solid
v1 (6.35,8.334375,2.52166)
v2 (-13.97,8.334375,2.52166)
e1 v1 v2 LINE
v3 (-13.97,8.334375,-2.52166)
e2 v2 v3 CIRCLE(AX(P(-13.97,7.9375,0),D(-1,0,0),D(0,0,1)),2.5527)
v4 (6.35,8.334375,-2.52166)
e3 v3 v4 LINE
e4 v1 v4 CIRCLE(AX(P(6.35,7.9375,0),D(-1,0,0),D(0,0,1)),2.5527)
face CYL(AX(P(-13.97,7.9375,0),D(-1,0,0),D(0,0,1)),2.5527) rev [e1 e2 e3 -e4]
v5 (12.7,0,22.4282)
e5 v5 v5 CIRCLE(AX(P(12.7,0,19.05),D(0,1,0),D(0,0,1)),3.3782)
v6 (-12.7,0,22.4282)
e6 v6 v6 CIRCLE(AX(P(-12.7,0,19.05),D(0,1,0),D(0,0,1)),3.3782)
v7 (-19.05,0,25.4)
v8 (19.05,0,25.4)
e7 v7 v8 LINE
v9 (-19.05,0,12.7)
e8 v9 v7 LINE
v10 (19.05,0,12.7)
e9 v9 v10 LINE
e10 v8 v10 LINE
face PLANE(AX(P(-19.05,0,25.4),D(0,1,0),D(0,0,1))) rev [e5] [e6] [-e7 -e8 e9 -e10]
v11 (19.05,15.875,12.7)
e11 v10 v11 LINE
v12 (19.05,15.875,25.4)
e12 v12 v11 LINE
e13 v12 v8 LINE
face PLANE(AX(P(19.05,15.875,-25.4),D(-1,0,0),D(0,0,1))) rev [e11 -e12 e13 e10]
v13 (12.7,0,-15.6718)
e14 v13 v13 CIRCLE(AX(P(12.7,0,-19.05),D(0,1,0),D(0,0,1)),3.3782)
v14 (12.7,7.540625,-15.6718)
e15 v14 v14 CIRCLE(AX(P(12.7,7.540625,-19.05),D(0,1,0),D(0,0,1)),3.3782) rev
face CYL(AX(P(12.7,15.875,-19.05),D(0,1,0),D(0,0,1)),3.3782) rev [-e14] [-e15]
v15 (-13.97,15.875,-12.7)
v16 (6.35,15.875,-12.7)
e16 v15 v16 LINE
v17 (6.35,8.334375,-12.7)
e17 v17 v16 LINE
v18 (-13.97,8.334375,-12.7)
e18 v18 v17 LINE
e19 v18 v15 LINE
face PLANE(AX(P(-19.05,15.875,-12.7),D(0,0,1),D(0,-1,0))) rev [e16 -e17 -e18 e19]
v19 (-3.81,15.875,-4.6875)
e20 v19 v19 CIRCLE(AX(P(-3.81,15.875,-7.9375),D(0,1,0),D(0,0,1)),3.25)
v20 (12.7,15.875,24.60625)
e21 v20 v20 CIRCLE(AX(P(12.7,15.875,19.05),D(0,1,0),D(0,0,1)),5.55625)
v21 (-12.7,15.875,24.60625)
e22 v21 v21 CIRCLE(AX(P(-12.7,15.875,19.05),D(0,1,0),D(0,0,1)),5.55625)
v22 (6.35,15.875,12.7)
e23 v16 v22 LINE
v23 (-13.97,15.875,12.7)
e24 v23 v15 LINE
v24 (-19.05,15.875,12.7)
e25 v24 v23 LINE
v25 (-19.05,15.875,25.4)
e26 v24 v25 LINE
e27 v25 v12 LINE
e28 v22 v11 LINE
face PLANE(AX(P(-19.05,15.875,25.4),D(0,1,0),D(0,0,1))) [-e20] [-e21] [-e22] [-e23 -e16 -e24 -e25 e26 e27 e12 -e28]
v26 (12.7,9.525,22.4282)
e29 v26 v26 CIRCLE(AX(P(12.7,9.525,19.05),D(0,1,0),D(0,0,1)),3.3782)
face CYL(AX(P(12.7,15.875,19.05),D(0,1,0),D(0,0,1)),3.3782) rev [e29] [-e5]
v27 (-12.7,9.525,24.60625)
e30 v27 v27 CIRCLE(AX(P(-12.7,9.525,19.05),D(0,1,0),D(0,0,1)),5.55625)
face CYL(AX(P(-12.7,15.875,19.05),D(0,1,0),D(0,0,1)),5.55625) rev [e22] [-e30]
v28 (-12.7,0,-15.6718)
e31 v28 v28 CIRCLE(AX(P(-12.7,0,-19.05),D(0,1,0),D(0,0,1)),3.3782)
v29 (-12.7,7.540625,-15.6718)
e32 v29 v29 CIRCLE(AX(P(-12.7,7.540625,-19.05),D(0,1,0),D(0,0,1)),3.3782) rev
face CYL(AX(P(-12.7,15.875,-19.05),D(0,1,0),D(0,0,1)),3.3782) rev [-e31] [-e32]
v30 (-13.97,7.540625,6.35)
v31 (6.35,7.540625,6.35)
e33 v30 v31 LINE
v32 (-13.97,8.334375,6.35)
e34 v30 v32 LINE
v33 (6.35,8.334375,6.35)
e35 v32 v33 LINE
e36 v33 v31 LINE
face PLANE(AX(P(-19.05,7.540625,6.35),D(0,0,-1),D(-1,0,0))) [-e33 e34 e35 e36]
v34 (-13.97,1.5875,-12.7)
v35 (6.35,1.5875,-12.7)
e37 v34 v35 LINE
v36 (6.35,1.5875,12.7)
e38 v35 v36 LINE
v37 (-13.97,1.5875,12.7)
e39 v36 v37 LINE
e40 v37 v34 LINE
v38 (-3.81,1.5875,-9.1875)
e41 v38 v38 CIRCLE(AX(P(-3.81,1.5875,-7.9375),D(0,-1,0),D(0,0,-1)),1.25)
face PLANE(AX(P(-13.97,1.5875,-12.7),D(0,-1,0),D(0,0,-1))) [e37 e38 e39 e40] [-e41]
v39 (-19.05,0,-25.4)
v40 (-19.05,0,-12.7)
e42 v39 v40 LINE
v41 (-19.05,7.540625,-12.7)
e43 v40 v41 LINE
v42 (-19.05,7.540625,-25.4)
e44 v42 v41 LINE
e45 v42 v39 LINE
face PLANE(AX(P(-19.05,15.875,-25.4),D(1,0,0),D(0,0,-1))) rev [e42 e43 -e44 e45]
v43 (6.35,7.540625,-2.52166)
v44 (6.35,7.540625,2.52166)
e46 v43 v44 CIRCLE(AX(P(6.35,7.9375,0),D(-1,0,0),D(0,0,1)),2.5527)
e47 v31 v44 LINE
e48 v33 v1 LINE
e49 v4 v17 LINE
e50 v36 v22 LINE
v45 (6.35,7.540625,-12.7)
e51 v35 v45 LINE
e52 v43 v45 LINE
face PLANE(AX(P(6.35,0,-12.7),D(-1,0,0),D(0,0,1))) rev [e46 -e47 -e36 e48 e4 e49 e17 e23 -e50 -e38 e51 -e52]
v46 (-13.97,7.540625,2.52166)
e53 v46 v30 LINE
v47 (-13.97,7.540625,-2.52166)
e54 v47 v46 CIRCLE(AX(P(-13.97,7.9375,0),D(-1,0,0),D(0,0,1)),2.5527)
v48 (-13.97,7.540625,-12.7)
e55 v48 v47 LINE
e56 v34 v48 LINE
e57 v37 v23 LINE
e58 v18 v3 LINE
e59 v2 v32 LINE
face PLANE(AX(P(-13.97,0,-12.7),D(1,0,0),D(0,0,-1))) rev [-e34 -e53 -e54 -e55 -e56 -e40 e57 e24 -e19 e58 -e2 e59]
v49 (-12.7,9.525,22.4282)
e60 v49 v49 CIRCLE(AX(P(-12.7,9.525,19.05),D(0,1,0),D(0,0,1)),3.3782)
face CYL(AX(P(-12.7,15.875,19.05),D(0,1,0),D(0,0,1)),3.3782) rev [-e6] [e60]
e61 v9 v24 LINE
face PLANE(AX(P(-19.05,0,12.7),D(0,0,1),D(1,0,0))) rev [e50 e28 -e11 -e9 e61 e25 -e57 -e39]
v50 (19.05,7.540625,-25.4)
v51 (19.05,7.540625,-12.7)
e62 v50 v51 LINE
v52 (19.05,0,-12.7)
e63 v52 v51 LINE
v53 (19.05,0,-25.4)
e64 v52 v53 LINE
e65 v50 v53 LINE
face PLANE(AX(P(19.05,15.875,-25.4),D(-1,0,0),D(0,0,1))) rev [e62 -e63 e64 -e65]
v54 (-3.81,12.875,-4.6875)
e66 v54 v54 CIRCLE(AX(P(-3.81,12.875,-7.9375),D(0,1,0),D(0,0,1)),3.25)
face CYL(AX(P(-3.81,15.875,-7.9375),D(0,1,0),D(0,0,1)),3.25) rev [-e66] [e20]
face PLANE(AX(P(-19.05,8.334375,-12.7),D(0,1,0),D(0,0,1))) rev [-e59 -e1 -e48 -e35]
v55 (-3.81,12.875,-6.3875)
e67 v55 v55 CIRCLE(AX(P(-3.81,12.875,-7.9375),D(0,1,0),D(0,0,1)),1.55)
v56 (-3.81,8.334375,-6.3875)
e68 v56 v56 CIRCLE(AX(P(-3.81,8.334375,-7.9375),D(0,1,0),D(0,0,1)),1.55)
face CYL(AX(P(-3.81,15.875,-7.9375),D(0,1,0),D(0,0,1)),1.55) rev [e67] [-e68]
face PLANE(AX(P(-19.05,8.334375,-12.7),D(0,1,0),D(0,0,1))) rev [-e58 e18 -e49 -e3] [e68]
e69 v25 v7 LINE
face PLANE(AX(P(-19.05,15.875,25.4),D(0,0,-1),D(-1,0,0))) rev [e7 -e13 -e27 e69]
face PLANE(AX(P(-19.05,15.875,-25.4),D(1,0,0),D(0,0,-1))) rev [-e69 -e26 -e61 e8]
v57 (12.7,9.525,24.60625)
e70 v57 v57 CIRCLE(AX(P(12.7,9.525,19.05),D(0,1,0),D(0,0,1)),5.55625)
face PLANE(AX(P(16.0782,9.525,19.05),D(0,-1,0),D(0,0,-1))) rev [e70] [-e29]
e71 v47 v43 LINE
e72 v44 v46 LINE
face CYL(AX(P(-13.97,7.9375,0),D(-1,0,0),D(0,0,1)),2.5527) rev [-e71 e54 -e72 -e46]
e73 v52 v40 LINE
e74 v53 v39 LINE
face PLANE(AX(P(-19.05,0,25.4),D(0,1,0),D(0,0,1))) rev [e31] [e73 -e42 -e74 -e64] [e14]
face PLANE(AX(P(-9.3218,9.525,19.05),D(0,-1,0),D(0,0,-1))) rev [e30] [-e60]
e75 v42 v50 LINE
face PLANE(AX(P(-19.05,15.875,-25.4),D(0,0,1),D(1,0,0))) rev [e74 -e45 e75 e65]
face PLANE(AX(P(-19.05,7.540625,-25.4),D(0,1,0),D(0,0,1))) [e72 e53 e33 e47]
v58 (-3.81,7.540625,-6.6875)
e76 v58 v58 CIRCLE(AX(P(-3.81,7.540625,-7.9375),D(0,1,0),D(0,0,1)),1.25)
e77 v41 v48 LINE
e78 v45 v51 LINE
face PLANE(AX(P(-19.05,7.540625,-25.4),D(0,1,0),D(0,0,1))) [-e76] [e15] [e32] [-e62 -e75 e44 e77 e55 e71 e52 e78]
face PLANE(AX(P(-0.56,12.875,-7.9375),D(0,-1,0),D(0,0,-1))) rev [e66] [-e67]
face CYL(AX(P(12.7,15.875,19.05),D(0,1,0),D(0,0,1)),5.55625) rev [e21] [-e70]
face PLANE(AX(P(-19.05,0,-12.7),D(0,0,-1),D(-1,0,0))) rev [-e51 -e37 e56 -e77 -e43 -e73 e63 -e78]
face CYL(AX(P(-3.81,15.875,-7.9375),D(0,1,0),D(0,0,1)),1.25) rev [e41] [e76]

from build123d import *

# Parameters (mm, degrees)
SKETCH1_W                                        = 38.1
SKETCH1_H                                        = 50.8
EXTRUDE1_DEPTH                                   = 15.875
CBORE_FOR_1_4_SOCKET_HEAD_CAP_SCREW1_D           = 6.7564
CBORE_FOR_1_4_SOCKET_HEAD_CAP_SCREW1_CBORE_D     = 11.1125
CBORE_FOR_1_4_SOCKET_HEAD_CAP_SCREW1_CBORE_DEPTH = 6.35
SKETCH3_W                                        = 5.08
SKETCH3_H                                        = 25.4
SKETCH3_W_2                                      = 12.7
CUT_EXTRUDE2_DEPTH                               = 36.497579143
SKETCH5_W                                        = 20.32
SKETCH5_H                                        = 25.4
CUT_EXTRUDE4_DEPTH                               = 1.5875
F_1_4_20_TAPPED_HOLE1_D                          = 5.1054
SKETCH11_W                                       = 19.05
SKETCH11_H                                       = 0.79375
CUT_EXTRUDE5_DEPTH                               = 49.464271634
ADVANCEDHOLE1_START                              = 12.875
ADVANCEDHOLE1_OUTLINE_R                          = 3.25
ADVANCEDHOLE1_DEPTH                              = 3
ADVANCEDHOLE1_START_2                            = 1.5875
ADVANCEDHOLE1_2_OUTLINE_R                        = 1.25
ADVANCEDHOLE1_2_DEPTH                            = 11.2875
ADVANCEDHOLE1_START_3                            = 8.334375
ADVANCEDHOLE1_3_OUTLINE_R                        = 1.55
ADVANCEDHOLE1_3_OUTLINE_R_2                      = 1.25
ADVANCEDHOLE1_3_DEPTH                            = 4.540625


# Read off the part's stored shape, not the designer's step: AdvancedHole1
with BuildPart() as part:
    # Sketch1 → Extrude1 (new body)
    with BuildSketch(Plane(origin=(0, 0, 0), x_dir=(1, 0, 0), z_dir=(0, 1, 0))):
        Rectangle(SKETCH1_W, SKETCH1_H)
    extrude(amount=EXTRUDE1_DEPTH)

    # CBORE for 1/4 Socket Head Cap Screw1 (through all)
    with Locations(Plane(origin=(0, 15.875, 0), x_dir=(-1, 0, 0), z_dir=(0, 1, 0))):
        with Locations((12.7, -19.05), (-12.7, -19.05), (-12.7, 19.05), (12.7, 19.05)):
            CounterBoreHole(CBORE_FOR_1_4_SOCKET_HEAD_CAP_SCREW1_D / 2, CBORE_FOR_1_4_SOCKET_HEAD_CAP_SCREW1_CBORE_D / 2, CBORE_FOR_1_4_SOCKET_HEAD_CAP_SCREW1_CBORE_DEPTH)

    # Sketch3 → Cut-Extrude2 (cut, through all)
    with BuildSketch(Plane(origin=(0, 15.875, 0), x_dir=(-1, 0, 0), z_dir=(0, 1, 0))):
        with Locations((16.51, 0)):
            Rectangle(SKETCH3_W, SKETCH3_H)
        with Locations((-12.7, 0)):
            Rectangle(SKETCH3_W_2, SKETCH3_H)
    extrude(amount=-CUT_EXTRUDE2_DEPTH, mode=Mode.SUBTRACT)

    # Sketch5 → Cut-Extrude4 (cut)
    with BuildSketch(Plane.XZ):
        with Locations((-3.81, 0)):
            Rectangle(SKETCH5_W, SKETCH5_H)
    extrude(amount=-CUT_EXTRUDE4_DEPTH, mode=Mode.SUBTRACT)

    # 1/4-20 Tapped Hole1 (through all)
    with Locations(Plane.ZY.offset(13.97)):
        with Locations((0, 7.9375)):
            Hole(F_1_4_20_TAPPED_HOLE1_D / 2)

    # Sketch11 → Cut-Extrude5 (cut, through all)
    with BuildSketch(Plane(origin=(19.05, 0, 0), x_dir=(0, 0, -1), z_dir=(1, 0, 0))):
        Polygon((25.4, 7.540625), (25.4, 15.875), (12.7, 15.875), (12.7, 8.334375), (12.7, 7.540625), align=None)
        with Locations((3.175, 7.9375)):
            Rectangle(SKETCH11_W, SKETCH11_H)
    extrude(amount=-CUT_EXTRUDE5_DEPTH, mode=Mode.SUBTRACT)

    # AdvancedHole1 outline → AdvancedHole1 (cut)
    with BuildSketch(Plane(origin=(0, 0, 0), x_dir=(1, 0, 0), z_dir=(0, 1, 0)).offset(ADVANCEDHOLE1_START)):
        with Locations((-3.81, 7.9375)):
            Circle(ADVANCEDHOLE1_OUTLINE_R)
    extrude(amount=ADVANCEDHOLE1_DEPTH, mode=Mode.SUBTRACT)

    # AdvancedHole1 2 outline → AdvancedHole1 2 (cut)
    with BuildSketch(Plane(origin=(0, 0, 0), x_dir=(1, 0, 0), z_dir=(0, 1, 0)).offset(ADVANCEDHOLE1_START_2)):
        with Locations((-3.81, 7.9375)):
            Circle(ADVANCEDHOLE1_2_OUTLINE_R)
    extrude(amount=ADVANCEDHOLE1_2_DEPTH, mode=Mode.SUBTRACT)

    # AdvancedHole1 3 outline → AdvancedHole1 3 (cut)
    with BuildSketch(Plane(origin=(0, 0, 0), x_dir=(1, 0, 0), z_dir=(0, 1, 0)).offset(ADVANCEDHOLE1_START_3)):
        with Locations((-3.81, 7.9375)):
            Circle(ADVANCEDHOLE1_3_OUTLINE_R)
        with Locations((-3.81, 7.9375)):
            Circle(ADVANCEDHOLE1_3_OUTLINE_R_2, mode=Mode.SUBTRACT)
    extrude(amount=ADVANCEDHOLE1_3_DEPTH, mode=Mode.SUBTRACT)


solid = part.part
